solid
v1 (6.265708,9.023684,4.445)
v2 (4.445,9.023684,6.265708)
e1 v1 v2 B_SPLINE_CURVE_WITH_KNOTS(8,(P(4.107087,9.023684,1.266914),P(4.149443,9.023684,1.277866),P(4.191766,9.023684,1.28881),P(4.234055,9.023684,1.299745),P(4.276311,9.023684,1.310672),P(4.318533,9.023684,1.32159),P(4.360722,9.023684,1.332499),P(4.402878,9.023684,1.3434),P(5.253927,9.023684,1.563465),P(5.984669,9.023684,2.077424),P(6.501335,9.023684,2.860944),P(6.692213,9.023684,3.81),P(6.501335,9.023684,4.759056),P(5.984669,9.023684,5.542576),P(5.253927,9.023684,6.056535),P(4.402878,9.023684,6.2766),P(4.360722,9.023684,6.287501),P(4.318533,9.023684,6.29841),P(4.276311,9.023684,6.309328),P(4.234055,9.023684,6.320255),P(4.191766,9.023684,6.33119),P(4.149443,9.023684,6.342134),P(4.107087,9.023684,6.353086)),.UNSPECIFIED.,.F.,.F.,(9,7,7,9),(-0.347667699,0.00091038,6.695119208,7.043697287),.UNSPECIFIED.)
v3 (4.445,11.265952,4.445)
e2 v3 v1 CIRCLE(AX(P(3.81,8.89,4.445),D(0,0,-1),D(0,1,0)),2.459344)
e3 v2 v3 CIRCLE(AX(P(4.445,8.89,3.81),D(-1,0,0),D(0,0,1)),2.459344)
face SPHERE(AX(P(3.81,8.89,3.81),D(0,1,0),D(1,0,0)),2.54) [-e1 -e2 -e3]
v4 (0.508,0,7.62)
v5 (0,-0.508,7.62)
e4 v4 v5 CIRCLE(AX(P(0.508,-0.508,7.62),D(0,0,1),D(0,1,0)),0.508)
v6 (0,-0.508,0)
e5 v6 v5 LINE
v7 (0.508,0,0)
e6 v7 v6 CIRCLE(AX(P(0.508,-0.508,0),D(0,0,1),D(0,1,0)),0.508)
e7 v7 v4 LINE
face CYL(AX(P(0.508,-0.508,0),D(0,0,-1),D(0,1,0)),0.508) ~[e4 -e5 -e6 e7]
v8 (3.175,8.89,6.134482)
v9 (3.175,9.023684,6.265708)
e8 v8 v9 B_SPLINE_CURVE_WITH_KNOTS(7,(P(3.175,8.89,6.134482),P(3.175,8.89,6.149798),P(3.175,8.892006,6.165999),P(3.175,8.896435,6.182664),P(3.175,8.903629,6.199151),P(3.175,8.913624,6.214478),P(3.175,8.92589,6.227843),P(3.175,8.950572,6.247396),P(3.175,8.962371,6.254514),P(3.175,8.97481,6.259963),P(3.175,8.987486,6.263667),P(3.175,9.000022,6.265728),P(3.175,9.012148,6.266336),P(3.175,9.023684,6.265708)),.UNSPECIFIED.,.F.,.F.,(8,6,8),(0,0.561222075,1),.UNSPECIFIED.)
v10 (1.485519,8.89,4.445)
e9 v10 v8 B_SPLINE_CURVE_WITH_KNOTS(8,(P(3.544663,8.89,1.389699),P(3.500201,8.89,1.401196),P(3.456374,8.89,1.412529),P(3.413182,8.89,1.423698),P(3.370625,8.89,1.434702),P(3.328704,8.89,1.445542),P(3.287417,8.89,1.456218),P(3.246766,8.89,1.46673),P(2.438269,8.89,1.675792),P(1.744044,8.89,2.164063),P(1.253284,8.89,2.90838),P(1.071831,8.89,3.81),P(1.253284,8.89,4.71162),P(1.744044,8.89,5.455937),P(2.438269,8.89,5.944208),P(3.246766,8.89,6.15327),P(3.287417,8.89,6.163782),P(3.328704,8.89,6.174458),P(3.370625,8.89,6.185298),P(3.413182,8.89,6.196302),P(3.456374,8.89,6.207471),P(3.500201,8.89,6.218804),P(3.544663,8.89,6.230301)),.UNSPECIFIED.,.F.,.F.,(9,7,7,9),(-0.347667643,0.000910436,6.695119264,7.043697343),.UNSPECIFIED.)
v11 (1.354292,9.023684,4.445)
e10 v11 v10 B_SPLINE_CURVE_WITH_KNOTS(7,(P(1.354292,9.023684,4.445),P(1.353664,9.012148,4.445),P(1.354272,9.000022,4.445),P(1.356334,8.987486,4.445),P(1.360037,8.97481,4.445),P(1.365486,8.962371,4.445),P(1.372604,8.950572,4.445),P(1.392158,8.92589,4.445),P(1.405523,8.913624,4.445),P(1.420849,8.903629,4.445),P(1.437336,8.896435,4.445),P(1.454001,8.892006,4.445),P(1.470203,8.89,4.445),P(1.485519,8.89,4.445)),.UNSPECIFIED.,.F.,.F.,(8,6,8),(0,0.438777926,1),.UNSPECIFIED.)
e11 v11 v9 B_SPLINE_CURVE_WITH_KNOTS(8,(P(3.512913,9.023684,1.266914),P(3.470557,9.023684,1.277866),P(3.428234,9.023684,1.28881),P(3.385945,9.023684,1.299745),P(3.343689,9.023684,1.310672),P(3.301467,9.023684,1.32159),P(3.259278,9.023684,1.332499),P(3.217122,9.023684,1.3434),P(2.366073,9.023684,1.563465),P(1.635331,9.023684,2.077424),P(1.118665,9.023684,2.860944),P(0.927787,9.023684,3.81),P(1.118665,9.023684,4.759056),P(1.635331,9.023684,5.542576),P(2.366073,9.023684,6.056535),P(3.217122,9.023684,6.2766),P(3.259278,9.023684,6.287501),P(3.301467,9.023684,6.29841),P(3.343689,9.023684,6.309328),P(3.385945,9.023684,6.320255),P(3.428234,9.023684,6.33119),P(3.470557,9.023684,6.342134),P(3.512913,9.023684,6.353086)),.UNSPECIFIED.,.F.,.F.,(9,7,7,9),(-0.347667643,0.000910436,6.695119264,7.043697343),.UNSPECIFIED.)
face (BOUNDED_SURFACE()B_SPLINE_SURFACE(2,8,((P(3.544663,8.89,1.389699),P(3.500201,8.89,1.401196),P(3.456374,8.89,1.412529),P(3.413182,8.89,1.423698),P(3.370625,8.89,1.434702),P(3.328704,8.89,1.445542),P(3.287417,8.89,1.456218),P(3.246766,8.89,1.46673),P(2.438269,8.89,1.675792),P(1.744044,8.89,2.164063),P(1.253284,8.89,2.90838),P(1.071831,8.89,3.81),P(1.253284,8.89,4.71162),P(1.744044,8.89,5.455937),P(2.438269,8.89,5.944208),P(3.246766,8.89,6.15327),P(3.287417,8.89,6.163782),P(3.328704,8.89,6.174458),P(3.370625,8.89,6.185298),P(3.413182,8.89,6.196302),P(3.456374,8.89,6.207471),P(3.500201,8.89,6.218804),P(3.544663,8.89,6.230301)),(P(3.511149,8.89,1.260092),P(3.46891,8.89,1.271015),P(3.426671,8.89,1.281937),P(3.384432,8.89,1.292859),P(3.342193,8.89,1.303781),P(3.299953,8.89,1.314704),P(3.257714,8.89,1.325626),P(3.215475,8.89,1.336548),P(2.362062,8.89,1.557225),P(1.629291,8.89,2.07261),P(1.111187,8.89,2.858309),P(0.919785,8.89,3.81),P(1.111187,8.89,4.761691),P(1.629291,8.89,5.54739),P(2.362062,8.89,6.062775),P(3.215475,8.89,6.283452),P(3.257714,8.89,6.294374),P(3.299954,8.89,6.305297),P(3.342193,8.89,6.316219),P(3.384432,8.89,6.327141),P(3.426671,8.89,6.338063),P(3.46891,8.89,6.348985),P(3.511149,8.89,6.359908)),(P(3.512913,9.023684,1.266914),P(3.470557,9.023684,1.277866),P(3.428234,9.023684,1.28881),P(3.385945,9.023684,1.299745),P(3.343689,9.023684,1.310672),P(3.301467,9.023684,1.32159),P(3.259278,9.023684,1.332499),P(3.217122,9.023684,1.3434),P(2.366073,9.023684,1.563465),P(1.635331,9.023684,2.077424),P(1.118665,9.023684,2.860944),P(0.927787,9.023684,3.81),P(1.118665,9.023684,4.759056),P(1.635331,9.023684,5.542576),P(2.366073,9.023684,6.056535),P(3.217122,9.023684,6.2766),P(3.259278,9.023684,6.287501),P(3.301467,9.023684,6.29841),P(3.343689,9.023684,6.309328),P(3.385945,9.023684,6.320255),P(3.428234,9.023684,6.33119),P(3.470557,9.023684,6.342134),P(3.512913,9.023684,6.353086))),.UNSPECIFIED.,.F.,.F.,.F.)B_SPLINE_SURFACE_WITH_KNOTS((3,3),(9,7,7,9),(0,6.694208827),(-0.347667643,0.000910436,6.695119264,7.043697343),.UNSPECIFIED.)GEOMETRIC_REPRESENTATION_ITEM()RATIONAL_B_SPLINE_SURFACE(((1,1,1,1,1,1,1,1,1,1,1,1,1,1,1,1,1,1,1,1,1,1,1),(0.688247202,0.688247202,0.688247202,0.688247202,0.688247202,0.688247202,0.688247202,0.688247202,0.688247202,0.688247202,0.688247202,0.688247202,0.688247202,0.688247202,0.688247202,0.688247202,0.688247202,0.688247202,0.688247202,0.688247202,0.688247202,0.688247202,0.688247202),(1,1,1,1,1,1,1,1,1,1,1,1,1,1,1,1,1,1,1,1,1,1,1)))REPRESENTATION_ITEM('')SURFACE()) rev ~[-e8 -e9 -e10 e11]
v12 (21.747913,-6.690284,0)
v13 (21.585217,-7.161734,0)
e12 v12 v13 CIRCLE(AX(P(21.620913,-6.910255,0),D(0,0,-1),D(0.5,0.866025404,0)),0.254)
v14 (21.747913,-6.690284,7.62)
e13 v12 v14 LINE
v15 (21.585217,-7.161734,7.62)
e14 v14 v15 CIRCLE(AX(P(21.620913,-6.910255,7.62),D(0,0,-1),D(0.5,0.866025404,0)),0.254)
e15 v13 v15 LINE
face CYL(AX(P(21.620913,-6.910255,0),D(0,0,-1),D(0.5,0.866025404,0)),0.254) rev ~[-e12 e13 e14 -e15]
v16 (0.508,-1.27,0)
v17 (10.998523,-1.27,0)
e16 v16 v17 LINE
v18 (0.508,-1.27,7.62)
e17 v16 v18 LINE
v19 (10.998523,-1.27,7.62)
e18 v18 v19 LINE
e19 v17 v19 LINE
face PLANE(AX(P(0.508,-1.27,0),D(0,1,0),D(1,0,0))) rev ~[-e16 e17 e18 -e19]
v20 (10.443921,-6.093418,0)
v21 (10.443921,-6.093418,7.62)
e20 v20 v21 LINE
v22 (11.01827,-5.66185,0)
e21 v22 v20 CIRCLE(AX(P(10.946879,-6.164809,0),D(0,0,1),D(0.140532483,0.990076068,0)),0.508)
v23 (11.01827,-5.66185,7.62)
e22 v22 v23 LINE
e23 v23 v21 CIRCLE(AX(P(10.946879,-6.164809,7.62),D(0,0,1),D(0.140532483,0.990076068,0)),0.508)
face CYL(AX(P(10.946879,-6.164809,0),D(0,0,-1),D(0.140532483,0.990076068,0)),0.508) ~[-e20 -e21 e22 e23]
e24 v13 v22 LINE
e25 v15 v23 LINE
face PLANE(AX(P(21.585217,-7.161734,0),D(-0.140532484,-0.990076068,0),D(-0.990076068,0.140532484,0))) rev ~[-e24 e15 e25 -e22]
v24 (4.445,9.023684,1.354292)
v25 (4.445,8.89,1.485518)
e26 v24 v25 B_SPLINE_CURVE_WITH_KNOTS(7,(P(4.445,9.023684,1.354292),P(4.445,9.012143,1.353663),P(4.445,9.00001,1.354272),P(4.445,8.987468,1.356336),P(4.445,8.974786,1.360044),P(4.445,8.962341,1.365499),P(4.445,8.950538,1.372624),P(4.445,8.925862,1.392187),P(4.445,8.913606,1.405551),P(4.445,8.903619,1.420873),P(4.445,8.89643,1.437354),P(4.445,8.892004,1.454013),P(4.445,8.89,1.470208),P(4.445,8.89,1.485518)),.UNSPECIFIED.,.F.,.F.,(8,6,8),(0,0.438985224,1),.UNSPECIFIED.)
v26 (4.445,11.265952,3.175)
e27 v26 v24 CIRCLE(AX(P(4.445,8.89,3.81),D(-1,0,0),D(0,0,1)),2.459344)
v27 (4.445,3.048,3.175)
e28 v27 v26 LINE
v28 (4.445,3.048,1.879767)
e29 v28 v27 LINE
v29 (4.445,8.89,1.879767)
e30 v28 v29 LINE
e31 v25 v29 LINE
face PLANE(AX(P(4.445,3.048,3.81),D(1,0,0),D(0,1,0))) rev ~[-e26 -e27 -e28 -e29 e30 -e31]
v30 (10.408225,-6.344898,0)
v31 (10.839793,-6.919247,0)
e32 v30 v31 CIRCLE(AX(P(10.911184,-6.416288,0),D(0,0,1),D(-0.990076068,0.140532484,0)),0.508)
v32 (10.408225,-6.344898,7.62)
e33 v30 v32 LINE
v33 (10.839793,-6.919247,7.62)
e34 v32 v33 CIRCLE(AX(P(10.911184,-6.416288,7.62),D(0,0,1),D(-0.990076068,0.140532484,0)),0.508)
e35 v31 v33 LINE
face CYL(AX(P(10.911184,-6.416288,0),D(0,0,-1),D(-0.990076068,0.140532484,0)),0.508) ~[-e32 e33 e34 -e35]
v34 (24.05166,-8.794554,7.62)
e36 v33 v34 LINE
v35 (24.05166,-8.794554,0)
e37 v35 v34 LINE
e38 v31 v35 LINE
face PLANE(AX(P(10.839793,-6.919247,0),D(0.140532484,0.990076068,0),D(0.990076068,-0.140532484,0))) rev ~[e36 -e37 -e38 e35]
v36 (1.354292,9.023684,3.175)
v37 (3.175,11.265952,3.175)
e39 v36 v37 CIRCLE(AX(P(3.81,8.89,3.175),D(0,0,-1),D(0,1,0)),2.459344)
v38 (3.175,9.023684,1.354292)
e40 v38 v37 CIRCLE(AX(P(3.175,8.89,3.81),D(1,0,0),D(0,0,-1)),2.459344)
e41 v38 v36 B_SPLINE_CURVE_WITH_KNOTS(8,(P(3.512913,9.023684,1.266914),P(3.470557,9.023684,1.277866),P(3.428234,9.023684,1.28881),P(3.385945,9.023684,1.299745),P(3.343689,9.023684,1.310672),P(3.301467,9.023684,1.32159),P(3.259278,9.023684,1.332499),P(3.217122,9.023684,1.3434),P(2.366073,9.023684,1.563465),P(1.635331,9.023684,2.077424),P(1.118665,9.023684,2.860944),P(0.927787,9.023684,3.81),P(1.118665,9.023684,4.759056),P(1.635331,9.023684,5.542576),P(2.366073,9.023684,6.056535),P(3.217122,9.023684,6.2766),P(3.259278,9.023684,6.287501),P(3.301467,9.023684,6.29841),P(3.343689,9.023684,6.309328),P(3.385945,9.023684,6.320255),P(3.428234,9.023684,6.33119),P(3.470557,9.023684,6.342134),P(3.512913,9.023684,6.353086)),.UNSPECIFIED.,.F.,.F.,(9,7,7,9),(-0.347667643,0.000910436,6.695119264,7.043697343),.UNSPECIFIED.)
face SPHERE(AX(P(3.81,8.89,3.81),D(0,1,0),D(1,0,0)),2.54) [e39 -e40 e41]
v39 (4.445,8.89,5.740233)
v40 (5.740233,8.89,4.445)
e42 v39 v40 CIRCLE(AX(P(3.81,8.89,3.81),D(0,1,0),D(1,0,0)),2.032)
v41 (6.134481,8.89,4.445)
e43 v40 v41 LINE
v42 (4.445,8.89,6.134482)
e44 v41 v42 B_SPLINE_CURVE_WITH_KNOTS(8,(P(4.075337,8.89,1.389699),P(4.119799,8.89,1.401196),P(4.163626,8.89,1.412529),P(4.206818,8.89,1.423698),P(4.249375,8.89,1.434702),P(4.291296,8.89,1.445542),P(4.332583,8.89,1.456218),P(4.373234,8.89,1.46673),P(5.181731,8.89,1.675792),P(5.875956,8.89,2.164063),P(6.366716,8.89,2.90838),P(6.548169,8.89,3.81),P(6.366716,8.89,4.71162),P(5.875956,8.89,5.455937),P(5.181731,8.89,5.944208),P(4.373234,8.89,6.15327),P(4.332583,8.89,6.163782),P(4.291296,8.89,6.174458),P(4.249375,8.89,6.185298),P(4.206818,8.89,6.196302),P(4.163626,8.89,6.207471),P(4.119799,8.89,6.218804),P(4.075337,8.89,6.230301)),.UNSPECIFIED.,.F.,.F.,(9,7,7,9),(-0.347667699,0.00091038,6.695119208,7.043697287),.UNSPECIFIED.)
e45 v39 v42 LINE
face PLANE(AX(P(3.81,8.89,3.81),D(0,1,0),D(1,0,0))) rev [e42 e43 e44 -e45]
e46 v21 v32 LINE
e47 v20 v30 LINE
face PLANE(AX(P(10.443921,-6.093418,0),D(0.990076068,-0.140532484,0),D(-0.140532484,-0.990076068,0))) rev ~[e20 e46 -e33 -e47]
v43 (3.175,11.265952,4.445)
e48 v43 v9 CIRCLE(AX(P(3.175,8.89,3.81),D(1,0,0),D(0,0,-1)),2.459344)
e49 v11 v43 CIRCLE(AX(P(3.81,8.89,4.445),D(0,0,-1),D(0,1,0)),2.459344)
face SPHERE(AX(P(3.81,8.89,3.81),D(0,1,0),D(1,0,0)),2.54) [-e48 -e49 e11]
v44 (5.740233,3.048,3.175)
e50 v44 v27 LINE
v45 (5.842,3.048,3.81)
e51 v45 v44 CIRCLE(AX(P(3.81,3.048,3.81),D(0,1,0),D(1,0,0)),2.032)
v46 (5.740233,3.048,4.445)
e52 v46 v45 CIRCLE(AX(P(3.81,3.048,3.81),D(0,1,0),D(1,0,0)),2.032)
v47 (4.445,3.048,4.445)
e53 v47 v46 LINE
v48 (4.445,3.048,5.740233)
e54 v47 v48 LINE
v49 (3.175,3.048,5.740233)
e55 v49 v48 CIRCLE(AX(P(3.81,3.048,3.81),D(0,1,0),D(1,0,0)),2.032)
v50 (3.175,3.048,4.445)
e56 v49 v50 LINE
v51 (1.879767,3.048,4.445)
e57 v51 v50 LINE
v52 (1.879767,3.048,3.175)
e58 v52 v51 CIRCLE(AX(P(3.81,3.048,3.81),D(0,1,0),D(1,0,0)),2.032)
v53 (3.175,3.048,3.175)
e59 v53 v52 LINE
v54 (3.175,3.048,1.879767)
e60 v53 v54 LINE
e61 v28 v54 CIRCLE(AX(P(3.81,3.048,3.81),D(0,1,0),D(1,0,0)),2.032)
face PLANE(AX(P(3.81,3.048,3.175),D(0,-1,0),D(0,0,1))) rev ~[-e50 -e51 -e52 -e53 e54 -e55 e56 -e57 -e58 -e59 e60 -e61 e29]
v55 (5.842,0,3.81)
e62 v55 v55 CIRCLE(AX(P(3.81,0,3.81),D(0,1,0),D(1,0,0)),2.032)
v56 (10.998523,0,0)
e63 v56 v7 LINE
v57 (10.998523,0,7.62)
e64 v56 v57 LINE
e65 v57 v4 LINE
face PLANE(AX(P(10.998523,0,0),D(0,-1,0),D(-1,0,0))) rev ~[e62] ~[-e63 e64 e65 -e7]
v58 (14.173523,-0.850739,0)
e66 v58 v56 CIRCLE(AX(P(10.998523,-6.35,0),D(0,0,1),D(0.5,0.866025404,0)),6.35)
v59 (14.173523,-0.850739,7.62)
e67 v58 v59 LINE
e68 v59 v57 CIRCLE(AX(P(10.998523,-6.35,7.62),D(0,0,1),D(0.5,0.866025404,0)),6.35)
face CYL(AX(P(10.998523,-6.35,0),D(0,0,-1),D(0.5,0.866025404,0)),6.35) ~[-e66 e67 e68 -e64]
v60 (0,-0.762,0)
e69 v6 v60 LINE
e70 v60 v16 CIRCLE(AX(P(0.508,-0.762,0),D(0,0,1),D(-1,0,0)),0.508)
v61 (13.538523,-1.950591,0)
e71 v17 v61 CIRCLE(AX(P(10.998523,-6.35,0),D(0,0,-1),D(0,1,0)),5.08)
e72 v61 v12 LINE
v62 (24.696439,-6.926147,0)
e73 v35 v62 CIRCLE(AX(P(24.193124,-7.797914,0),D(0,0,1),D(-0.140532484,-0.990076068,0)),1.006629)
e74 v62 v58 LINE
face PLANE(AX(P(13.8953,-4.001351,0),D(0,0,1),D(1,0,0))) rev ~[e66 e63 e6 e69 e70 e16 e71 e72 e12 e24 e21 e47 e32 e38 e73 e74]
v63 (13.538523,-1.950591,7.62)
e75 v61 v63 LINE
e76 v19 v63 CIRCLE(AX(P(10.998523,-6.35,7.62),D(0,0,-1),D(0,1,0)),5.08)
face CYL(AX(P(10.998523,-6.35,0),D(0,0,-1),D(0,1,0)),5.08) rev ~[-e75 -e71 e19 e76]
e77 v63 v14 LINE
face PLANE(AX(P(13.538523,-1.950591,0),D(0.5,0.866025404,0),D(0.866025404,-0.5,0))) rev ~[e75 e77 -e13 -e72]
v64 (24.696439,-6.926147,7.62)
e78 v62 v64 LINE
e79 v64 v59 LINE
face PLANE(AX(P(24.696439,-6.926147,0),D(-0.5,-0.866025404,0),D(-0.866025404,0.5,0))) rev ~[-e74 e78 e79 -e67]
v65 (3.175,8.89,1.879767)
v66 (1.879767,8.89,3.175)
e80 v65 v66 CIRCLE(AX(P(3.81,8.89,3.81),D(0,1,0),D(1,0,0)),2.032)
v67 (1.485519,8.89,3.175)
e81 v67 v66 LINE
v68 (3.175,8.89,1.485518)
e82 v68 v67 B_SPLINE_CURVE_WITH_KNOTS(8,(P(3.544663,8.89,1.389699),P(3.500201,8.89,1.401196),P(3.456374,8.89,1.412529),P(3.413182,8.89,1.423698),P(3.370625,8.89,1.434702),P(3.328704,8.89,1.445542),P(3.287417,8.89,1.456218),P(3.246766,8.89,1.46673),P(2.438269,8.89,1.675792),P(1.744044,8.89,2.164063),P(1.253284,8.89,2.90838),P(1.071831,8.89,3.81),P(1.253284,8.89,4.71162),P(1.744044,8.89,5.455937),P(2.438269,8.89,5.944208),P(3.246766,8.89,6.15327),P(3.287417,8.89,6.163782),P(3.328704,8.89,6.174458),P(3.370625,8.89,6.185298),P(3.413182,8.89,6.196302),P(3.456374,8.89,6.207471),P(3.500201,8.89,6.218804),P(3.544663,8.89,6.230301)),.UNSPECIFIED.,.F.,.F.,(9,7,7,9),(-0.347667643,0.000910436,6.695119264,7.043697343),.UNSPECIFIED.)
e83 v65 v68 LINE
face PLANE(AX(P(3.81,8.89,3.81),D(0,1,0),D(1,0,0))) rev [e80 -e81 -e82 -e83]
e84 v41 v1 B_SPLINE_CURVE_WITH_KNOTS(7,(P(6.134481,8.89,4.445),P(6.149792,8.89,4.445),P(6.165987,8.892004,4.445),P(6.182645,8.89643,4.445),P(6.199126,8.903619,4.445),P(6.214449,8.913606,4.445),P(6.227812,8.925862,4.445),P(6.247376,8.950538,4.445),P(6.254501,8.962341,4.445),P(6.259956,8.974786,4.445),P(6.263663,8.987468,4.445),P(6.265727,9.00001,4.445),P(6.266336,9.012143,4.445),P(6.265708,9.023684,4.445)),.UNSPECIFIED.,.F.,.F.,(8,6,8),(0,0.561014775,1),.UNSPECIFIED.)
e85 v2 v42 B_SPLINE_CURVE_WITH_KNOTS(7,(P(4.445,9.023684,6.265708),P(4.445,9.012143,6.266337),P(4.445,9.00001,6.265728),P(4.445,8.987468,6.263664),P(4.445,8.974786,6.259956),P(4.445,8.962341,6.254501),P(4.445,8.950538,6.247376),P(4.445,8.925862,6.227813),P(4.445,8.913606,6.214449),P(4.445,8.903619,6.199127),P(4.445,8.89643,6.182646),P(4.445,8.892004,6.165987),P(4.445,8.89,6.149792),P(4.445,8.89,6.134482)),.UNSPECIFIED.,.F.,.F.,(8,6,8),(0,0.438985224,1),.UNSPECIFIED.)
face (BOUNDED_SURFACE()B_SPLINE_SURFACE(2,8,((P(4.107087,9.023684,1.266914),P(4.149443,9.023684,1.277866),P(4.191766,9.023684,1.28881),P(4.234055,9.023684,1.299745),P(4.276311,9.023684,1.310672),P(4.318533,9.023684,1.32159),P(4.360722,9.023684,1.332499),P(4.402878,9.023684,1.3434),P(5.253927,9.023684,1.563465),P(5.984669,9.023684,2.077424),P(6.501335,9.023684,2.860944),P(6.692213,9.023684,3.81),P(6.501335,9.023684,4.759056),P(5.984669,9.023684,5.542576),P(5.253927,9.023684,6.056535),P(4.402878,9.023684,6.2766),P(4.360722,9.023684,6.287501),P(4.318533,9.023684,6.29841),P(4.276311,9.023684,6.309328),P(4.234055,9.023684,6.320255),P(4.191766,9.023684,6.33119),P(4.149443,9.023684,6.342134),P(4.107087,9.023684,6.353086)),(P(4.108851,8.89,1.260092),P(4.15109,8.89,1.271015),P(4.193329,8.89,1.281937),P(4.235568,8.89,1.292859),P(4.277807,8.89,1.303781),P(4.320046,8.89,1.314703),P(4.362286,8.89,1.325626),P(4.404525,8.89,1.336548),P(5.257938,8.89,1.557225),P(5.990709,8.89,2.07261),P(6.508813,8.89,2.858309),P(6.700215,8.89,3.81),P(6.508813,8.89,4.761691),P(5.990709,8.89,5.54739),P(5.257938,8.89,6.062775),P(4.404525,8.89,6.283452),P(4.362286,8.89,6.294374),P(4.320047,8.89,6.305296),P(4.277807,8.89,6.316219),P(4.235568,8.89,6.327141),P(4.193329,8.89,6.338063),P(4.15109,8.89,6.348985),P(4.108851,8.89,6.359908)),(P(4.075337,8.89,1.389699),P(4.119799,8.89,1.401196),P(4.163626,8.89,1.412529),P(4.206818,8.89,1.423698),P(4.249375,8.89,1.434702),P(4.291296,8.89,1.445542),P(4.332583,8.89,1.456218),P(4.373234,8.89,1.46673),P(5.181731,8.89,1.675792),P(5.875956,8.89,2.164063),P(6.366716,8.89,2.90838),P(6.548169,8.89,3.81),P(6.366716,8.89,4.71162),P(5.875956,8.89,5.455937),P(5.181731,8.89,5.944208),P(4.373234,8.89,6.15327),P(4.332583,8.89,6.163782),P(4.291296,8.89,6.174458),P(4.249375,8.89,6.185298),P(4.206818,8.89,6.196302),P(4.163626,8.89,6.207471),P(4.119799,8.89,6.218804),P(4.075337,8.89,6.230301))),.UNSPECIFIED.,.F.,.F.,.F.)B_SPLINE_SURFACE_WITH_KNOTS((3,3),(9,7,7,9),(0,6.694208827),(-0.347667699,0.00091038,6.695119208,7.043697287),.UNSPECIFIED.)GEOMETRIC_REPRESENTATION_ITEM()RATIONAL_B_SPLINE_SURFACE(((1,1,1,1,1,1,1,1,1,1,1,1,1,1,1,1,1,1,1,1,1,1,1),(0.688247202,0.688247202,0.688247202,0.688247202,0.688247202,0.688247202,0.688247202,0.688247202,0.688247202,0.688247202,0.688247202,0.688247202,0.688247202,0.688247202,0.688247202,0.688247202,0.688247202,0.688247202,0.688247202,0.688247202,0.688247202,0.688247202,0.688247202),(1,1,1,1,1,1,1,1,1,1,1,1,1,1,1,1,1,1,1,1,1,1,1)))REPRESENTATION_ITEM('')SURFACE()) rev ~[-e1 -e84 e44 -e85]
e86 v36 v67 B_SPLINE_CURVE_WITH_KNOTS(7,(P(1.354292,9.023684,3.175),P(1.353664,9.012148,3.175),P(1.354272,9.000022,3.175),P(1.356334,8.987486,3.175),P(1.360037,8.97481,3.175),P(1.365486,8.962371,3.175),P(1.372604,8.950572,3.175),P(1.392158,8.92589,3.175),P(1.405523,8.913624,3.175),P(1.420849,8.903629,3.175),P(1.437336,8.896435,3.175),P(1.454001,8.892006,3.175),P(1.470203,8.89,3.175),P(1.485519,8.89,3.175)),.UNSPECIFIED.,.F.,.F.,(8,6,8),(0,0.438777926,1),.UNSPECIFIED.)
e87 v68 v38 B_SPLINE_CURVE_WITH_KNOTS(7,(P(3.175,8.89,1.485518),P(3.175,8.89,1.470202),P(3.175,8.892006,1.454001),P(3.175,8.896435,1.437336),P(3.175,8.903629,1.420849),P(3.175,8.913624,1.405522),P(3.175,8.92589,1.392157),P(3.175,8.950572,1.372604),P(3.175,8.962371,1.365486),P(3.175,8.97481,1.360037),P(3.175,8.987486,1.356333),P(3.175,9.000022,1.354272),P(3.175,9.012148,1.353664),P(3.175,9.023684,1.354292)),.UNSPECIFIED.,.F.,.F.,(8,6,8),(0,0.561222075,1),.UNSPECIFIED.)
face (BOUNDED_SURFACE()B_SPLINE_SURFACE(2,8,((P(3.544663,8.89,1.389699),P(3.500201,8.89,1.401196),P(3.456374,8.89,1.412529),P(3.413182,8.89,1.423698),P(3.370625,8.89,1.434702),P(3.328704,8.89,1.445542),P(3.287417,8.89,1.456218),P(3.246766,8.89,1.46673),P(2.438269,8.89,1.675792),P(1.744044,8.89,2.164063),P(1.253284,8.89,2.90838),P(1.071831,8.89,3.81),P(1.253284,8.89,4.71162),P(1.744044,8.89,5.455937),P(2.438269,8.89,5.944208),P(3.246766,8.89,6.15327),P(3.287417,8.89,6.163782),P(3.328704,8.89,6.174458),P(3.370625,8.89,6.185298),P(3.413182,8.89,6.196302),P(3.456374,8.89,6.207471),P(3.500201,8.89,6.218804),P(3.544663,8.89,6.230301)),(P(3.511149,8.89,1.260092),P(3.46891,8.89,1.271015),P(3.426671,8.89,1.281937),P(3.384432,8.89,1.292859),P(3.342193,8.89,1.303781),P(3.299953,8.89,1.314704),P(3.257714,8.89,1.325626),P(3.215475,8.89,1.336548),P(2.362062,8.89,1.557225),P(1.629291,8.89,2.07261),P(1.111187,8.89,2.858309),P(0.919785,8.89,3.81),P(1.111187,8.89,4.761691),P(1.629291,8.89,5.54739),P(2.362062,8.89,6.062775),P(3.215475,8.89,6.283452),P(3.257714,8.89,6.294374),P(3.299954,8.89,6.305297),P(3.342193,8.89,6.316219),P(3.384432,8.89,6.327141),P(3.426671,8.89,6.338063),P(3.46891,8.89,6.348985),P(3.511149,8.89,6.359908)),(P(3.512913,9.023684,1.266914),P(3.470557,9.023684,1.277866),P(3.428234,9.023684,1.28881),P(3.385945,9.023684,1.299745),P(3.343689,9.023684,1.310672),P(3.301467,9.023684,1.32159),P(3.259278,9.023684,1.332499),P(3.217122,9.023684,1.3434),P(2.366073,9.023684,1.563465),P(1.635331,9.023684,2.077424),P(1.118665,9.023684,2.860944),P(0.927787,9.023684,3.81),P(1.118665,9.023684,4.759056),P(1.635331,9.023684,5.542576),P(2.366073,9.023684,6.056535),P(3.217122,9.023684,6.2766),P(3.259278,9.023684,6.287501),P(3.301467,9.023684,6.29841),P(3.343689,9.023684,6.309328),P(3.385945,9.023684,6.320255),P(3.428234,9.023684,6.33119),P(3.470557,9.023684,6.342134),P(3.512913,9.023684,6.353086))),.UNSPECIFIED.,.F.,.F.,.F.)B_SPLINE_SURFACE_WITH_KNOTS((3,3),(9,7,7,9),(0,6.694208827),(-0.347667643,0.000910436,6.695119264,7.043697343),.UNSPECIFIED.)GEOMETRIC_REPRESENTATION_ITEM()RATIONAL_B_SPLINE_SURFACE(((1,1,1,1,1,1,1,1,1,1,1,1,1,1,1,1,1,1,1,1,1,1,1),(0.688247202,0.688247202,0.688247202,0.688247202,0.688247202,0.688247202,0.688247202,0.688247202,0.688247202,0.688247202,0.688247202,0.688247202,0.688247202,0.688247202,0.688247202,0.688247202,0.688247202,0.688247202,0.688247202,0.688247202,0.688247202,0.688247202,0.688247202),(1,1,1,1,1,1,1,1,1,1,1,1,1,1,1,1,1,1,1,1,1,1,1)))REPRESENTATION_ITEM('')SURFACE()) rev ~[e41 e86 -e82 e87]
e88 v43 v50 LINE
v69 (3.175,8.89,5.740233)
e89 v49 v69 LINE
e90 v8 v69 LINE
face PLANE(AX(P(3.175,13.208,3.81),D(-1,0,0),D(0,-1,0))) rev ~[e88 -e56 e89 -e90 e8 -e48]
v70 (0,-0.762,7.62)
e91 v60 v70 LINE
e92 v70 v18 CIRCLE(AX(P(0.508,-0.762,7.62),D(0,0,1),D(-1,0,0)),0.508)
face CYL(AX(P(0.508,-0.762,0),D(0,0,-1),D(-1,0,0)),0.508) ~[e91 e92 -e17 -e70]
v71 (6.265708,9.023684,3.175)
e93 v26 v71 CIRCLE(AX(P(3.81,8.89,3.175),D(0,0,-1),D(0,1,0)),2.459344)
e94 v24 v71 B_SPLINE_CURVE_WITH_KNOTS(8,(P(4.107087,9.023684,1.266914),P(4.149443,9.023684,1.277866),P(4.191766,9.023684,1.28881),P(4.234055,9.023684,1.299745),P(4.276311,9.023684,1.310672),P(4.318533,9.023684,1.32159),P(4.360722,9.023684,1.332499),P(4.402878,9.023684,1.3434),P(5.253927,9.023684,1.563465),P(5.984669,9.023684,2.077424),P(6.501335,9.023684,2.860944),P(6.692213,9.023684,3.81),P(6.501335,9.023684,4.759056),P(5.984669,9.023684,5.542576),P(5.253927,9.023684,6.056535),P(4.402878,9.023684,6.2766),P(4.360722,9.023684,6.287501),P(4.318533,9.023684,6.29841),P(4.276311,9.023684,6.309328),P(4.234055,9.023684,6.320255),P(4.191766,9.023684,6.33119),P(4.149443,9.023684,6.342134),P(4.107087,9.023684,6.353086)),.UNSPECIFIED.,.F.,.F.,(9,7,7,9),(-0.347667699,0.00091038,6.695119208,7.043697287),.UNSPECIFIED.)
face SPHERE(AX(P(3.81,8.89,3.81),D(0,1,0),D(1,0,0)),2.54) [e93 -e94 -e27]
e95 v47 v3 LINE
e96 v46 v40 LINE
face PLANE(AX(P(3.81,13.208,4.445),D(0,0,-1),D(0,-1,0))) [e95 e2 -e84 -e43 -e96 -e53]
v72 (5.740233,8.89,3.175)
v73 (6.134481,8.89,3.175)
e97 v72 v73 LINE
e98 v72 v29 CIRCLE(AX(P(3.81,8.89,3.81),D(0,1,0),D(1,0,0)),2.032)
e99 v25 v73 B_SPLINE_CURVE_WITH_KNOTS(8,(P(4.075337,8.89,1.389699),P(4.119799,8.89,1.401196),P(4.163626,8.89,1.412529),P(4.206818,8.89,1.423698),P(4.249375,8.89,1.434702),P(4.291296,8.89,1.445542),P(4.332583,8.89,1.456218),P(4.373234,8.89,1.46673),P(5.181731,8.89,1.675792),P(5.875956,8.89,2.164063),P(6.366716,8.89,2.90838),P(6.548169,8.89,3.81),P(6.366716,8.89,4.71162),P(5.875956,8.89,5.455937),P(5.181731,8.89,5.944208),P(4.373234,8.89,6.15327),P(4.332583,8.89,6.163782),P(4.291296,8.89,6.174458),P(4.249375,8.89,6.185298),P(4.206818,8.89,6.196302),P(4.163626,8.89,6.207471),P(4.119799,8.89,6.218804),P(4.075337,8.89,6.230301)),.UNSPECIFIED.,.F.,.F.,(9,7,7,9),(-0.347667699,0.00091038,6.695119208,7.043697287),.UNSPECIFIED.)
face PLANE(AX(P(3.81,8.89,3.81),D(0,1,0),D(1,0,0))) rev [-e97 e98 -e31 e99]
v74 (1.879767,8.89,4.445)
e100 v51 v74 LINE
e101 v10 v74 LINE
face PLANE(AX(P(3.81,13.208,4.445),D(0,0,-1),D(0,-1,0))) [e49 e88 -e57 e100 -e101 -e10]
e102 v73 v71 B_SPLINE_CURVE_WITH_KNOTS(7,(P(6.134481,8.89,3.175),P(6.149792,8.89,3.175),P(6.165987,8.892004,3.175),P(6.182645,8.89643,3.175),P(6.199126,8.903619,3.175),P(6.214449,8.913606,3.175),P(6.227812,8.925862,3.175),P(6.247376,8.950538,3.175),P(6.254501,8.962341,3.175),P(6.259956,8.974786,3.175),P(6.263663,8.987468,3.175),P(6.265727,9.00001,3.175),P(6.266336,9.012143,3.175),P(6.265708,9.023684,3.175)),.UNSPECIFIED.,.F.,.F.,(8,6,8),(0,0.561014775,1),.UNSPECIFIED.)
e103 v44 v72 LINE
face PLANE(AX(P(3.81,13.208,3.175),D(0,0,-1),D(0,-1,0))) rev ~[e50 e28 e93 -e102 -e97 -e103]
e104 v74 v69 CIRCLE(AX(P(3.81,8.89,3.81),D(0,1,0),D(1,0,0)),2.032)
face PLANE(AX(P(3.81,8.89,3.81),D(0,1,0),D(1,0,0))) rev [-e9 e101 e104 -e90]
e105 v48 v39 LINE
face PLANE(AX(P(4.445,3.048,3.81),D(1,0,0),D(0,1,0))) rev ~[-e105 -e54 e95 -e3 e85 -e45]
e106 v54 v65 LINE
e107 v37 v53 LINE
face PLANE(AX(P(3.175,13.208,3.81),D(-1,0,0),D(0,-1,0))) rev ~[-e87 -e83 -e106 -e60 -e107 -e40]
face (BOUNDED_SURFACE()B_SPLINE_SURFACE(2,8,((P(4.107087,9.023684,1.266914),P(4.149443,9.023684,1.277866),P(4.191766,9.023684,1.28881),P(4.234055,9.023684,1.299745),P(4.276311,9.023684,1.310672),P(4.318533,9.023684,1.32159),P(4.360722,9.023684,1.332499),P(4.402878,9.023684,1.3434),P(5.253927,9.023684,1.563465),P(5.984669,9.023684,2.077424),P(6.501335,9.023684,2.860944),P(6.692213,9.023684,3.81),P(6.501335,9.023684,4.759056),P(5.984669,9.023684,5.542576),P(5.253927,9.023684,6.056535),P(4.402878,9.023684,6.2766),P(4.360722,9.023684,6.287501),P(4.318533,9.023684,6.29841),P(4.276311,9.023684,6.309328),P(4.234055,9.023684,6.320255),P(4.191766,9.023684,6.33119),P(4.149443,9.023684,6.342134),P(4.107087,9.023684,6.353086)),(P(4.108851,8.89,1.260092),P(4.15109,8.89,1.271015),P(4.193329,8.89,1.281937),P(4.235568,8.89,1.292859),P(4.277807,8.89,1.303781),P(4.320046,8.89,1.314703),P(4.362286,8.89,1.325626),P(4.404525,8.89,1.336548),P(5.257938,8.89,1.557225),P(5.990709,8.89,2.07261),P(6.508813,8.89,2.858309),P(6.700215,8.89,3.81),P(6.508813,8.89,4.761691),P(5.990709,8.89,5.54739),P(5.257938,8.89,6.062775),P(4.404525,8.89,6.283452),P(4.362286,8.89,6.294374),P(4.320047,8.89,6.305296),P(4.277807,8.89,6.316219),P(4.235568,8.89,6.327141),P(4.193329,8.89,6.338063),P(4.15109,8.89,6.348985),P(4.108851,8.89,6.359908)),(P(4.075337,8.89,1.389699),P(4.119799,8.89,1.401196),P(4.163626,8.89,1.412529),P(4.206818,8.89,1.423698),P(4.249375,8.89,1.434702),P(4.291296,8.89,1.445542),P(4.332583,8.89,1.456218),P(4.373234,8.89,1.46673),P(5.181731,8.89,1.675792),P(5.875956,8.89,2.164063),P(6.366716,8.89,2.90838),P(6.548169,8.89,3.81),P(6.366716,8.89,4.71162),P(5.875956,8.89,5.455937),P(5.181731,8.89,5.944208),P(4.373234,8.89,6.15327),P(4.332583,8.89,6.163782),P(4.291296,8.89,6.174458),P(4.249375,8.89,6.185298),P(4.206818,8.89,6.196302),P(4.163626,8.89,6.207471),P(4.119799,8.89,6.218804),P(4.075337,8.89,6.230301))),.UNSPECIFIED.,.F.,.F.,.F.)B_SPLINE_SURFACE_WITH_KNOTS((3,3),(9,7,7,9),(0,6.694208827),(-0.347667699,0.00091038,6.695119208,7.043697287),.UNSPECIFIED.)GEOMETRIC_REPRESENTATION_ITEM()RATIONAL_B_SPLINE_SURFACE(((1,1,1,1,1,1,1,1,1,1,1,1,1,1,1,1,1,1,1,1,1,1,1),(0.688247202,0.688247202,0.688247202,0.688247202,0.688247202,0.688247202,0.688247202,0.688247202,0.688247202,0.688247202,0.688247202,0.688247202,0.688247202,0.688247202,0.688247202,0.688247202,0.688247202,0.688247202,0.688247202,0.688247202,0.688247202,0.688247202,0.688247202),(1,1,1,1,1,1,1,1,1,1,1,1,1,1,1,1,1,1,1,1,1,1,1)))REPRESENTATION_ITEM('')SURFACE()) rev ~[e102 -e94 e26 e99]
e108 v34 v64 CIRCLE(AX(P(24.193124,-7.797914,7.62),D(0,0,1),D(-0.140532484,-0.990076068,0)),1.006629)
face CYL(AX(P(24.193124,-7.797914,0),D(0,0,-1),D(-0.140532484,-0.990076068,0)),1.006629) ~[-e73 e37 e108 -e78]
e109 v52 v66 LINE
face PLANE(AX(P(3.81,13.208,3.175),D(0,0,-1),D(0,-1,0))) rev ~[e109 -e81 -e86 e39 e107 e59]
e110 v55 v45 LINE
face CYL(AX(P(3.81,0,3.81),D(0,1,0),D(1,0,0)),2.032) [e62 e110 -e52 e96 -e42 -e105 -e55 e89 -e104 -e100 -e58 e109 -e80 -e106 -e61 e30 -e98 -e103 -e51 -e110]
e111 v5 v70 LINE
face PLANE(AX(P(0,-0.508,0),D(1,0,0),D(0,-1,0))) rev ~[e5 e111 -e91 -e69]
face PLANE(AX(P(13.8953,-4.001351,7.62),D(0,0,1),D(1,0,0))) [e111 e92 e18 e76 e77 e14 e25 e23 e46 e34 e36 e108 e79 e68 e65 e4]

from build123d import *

# Parameters (mm, degrees)
F1_DEPTH  = 7.62
F3_W      = 0.635
F3_H      = 5.842
F6_DEPTH  = 12.7
F7_R      = 0.127
F9_W      = 10.16
F9_H      = 1.27
F10_DEPTH = 3.175


with BuildPart() as f1:
    # F0 (on Top) → F1 (new body)
    with BuildSketch(Plane.XY):
        with BuildLine():
            Line((10.9985226281, 0), (0.508, 0))
            ThreePointArc((0.508, 0), (0.1487897552, -0.1487897552), (0, -0.508))
            Line((0, -0.508), (0, -0.762))
            ThreePointArc((0, -0.762), (0.1487897552, -1.1212102448), (0.508, -1.27))
            Line((0.508, -1.27), (10.9985226281, -1.27))
            ThreePointArc((10.9985226281, -1.27), (12.3133233772, -1.4430968025), (13.5385226281, -1.9505909488))
            Line((13.5385226281, -1.9505909488), (21.7479125756, -6.6902844449))
            ThreePointArc((21.7479125756, -6.6902844449), (21.8610174728, -6.9931140452), (21.5852173248, -7.1617342188))
            Line((21.5852173248, -7.1617342188), (11.0182697374, -5.6618500829))
            ThreePointArc((11.0182697374, -5.6618500829), (10.6417144767, -5.7586825509), (10.4439205931, -6.093418224))
            Line((10.4439205931, -6.093418224), (10.4082253422, -6.3448975453))
            ThreePointArc((10.4082253422, -6.3448975453), (10.5050578102, -6.7214528061), (10.8397934833, -6.9192466897))
            Line((10.8397934833, -6.9192466897), (24.0516598784, -8.7945535034))
            ThreePointArc((24.0516598784, -8.7945535034), (25.144685653, -8.1262935433), (24.6964387295, -6.9261471298))
            Line((24.6964387295, -6.9261471298), (14.1735226281, -0.850738686))
            ThreePointArc((14.1735226281, -0.850738686), (12.6420235645, -0.2163710031), (10.9985226281, 0))
        make_face()
    extrude(amount=F1_DEPTH)

    # F3 (on offset) → F4 (revolve)
    with BuildSketch(Plane.XY.offset(3.81)):
        Polygon((3.81, 3.048), (3.81, 0), (5.842, 0), (5.842, 8.89), (4.445, 8.89), (4.445, 3.048), align=None)
        with BuildLine():
            Line((4.445, 8.89), (5.842, 8.89))
            Line((5.842, 8.89), (6.35, 8.89))
            ThreePointArc((6.35, 8.89), (5.8180463142, 10.4454259867), (4.445, 11.3493444248))
            Line((4.445, 11.3493444248), (4.445, 8.89))
        make_face()
        with BuildLine():
            Line((3.81, 11.43), (3.81, 8.89))
            Line((3.81, 8.89), (4.445, 8.89))
            Line((4.445, 8.89), (4.445, 11.3493444248))
            ThreePointArc((4.445, 11.3493444248), (4.1300509029, 11.4097554285), (3.81, 11.43))
        make_face()
        with Locations((4.1275, 5.969)):
            Rectangle(F3_W, F3_H)
    revolve(axis=Axis((3.81, 4.445, 3.81), (0, 1, 0)))

    # F5 (on offset) → F6 (cut, symmetric)
    with BuildSketch(Plane.XY.offset(3.81)):
        Polygon((3.175, 3.048), (3.81, 3.048), (4.445, 3.048), (4.445, 13.208), (3.175, 13.208), align=None)
    extrude(amount=F6_DEPTH, both=True, mode=Mode.SUBTRACT)

    # F7
    f7_edges = [f1.edges().sort_by_distance(p)[0] for p in [
        (1.27, 8.89, 3.81),
        (6.35, 8.89, 3.81),
    ]]
    fillet(f7_edges, radius=F7_R)

    # F9 (on offset) → F10 (cut, symmetric)
    with BuildSketch(Plane(origin=(3.81, 0, 0), x_dir=(0, -1, 0), z_dir=(-1, 0, 0))):
        with Locations((-8.128, 3.81)):
            Rectangle(F9_W, F9_H)
    extrude(amount=F10_DEPTH, both=True, mode=Mode.SUBTRACT)


solid = f1.part
